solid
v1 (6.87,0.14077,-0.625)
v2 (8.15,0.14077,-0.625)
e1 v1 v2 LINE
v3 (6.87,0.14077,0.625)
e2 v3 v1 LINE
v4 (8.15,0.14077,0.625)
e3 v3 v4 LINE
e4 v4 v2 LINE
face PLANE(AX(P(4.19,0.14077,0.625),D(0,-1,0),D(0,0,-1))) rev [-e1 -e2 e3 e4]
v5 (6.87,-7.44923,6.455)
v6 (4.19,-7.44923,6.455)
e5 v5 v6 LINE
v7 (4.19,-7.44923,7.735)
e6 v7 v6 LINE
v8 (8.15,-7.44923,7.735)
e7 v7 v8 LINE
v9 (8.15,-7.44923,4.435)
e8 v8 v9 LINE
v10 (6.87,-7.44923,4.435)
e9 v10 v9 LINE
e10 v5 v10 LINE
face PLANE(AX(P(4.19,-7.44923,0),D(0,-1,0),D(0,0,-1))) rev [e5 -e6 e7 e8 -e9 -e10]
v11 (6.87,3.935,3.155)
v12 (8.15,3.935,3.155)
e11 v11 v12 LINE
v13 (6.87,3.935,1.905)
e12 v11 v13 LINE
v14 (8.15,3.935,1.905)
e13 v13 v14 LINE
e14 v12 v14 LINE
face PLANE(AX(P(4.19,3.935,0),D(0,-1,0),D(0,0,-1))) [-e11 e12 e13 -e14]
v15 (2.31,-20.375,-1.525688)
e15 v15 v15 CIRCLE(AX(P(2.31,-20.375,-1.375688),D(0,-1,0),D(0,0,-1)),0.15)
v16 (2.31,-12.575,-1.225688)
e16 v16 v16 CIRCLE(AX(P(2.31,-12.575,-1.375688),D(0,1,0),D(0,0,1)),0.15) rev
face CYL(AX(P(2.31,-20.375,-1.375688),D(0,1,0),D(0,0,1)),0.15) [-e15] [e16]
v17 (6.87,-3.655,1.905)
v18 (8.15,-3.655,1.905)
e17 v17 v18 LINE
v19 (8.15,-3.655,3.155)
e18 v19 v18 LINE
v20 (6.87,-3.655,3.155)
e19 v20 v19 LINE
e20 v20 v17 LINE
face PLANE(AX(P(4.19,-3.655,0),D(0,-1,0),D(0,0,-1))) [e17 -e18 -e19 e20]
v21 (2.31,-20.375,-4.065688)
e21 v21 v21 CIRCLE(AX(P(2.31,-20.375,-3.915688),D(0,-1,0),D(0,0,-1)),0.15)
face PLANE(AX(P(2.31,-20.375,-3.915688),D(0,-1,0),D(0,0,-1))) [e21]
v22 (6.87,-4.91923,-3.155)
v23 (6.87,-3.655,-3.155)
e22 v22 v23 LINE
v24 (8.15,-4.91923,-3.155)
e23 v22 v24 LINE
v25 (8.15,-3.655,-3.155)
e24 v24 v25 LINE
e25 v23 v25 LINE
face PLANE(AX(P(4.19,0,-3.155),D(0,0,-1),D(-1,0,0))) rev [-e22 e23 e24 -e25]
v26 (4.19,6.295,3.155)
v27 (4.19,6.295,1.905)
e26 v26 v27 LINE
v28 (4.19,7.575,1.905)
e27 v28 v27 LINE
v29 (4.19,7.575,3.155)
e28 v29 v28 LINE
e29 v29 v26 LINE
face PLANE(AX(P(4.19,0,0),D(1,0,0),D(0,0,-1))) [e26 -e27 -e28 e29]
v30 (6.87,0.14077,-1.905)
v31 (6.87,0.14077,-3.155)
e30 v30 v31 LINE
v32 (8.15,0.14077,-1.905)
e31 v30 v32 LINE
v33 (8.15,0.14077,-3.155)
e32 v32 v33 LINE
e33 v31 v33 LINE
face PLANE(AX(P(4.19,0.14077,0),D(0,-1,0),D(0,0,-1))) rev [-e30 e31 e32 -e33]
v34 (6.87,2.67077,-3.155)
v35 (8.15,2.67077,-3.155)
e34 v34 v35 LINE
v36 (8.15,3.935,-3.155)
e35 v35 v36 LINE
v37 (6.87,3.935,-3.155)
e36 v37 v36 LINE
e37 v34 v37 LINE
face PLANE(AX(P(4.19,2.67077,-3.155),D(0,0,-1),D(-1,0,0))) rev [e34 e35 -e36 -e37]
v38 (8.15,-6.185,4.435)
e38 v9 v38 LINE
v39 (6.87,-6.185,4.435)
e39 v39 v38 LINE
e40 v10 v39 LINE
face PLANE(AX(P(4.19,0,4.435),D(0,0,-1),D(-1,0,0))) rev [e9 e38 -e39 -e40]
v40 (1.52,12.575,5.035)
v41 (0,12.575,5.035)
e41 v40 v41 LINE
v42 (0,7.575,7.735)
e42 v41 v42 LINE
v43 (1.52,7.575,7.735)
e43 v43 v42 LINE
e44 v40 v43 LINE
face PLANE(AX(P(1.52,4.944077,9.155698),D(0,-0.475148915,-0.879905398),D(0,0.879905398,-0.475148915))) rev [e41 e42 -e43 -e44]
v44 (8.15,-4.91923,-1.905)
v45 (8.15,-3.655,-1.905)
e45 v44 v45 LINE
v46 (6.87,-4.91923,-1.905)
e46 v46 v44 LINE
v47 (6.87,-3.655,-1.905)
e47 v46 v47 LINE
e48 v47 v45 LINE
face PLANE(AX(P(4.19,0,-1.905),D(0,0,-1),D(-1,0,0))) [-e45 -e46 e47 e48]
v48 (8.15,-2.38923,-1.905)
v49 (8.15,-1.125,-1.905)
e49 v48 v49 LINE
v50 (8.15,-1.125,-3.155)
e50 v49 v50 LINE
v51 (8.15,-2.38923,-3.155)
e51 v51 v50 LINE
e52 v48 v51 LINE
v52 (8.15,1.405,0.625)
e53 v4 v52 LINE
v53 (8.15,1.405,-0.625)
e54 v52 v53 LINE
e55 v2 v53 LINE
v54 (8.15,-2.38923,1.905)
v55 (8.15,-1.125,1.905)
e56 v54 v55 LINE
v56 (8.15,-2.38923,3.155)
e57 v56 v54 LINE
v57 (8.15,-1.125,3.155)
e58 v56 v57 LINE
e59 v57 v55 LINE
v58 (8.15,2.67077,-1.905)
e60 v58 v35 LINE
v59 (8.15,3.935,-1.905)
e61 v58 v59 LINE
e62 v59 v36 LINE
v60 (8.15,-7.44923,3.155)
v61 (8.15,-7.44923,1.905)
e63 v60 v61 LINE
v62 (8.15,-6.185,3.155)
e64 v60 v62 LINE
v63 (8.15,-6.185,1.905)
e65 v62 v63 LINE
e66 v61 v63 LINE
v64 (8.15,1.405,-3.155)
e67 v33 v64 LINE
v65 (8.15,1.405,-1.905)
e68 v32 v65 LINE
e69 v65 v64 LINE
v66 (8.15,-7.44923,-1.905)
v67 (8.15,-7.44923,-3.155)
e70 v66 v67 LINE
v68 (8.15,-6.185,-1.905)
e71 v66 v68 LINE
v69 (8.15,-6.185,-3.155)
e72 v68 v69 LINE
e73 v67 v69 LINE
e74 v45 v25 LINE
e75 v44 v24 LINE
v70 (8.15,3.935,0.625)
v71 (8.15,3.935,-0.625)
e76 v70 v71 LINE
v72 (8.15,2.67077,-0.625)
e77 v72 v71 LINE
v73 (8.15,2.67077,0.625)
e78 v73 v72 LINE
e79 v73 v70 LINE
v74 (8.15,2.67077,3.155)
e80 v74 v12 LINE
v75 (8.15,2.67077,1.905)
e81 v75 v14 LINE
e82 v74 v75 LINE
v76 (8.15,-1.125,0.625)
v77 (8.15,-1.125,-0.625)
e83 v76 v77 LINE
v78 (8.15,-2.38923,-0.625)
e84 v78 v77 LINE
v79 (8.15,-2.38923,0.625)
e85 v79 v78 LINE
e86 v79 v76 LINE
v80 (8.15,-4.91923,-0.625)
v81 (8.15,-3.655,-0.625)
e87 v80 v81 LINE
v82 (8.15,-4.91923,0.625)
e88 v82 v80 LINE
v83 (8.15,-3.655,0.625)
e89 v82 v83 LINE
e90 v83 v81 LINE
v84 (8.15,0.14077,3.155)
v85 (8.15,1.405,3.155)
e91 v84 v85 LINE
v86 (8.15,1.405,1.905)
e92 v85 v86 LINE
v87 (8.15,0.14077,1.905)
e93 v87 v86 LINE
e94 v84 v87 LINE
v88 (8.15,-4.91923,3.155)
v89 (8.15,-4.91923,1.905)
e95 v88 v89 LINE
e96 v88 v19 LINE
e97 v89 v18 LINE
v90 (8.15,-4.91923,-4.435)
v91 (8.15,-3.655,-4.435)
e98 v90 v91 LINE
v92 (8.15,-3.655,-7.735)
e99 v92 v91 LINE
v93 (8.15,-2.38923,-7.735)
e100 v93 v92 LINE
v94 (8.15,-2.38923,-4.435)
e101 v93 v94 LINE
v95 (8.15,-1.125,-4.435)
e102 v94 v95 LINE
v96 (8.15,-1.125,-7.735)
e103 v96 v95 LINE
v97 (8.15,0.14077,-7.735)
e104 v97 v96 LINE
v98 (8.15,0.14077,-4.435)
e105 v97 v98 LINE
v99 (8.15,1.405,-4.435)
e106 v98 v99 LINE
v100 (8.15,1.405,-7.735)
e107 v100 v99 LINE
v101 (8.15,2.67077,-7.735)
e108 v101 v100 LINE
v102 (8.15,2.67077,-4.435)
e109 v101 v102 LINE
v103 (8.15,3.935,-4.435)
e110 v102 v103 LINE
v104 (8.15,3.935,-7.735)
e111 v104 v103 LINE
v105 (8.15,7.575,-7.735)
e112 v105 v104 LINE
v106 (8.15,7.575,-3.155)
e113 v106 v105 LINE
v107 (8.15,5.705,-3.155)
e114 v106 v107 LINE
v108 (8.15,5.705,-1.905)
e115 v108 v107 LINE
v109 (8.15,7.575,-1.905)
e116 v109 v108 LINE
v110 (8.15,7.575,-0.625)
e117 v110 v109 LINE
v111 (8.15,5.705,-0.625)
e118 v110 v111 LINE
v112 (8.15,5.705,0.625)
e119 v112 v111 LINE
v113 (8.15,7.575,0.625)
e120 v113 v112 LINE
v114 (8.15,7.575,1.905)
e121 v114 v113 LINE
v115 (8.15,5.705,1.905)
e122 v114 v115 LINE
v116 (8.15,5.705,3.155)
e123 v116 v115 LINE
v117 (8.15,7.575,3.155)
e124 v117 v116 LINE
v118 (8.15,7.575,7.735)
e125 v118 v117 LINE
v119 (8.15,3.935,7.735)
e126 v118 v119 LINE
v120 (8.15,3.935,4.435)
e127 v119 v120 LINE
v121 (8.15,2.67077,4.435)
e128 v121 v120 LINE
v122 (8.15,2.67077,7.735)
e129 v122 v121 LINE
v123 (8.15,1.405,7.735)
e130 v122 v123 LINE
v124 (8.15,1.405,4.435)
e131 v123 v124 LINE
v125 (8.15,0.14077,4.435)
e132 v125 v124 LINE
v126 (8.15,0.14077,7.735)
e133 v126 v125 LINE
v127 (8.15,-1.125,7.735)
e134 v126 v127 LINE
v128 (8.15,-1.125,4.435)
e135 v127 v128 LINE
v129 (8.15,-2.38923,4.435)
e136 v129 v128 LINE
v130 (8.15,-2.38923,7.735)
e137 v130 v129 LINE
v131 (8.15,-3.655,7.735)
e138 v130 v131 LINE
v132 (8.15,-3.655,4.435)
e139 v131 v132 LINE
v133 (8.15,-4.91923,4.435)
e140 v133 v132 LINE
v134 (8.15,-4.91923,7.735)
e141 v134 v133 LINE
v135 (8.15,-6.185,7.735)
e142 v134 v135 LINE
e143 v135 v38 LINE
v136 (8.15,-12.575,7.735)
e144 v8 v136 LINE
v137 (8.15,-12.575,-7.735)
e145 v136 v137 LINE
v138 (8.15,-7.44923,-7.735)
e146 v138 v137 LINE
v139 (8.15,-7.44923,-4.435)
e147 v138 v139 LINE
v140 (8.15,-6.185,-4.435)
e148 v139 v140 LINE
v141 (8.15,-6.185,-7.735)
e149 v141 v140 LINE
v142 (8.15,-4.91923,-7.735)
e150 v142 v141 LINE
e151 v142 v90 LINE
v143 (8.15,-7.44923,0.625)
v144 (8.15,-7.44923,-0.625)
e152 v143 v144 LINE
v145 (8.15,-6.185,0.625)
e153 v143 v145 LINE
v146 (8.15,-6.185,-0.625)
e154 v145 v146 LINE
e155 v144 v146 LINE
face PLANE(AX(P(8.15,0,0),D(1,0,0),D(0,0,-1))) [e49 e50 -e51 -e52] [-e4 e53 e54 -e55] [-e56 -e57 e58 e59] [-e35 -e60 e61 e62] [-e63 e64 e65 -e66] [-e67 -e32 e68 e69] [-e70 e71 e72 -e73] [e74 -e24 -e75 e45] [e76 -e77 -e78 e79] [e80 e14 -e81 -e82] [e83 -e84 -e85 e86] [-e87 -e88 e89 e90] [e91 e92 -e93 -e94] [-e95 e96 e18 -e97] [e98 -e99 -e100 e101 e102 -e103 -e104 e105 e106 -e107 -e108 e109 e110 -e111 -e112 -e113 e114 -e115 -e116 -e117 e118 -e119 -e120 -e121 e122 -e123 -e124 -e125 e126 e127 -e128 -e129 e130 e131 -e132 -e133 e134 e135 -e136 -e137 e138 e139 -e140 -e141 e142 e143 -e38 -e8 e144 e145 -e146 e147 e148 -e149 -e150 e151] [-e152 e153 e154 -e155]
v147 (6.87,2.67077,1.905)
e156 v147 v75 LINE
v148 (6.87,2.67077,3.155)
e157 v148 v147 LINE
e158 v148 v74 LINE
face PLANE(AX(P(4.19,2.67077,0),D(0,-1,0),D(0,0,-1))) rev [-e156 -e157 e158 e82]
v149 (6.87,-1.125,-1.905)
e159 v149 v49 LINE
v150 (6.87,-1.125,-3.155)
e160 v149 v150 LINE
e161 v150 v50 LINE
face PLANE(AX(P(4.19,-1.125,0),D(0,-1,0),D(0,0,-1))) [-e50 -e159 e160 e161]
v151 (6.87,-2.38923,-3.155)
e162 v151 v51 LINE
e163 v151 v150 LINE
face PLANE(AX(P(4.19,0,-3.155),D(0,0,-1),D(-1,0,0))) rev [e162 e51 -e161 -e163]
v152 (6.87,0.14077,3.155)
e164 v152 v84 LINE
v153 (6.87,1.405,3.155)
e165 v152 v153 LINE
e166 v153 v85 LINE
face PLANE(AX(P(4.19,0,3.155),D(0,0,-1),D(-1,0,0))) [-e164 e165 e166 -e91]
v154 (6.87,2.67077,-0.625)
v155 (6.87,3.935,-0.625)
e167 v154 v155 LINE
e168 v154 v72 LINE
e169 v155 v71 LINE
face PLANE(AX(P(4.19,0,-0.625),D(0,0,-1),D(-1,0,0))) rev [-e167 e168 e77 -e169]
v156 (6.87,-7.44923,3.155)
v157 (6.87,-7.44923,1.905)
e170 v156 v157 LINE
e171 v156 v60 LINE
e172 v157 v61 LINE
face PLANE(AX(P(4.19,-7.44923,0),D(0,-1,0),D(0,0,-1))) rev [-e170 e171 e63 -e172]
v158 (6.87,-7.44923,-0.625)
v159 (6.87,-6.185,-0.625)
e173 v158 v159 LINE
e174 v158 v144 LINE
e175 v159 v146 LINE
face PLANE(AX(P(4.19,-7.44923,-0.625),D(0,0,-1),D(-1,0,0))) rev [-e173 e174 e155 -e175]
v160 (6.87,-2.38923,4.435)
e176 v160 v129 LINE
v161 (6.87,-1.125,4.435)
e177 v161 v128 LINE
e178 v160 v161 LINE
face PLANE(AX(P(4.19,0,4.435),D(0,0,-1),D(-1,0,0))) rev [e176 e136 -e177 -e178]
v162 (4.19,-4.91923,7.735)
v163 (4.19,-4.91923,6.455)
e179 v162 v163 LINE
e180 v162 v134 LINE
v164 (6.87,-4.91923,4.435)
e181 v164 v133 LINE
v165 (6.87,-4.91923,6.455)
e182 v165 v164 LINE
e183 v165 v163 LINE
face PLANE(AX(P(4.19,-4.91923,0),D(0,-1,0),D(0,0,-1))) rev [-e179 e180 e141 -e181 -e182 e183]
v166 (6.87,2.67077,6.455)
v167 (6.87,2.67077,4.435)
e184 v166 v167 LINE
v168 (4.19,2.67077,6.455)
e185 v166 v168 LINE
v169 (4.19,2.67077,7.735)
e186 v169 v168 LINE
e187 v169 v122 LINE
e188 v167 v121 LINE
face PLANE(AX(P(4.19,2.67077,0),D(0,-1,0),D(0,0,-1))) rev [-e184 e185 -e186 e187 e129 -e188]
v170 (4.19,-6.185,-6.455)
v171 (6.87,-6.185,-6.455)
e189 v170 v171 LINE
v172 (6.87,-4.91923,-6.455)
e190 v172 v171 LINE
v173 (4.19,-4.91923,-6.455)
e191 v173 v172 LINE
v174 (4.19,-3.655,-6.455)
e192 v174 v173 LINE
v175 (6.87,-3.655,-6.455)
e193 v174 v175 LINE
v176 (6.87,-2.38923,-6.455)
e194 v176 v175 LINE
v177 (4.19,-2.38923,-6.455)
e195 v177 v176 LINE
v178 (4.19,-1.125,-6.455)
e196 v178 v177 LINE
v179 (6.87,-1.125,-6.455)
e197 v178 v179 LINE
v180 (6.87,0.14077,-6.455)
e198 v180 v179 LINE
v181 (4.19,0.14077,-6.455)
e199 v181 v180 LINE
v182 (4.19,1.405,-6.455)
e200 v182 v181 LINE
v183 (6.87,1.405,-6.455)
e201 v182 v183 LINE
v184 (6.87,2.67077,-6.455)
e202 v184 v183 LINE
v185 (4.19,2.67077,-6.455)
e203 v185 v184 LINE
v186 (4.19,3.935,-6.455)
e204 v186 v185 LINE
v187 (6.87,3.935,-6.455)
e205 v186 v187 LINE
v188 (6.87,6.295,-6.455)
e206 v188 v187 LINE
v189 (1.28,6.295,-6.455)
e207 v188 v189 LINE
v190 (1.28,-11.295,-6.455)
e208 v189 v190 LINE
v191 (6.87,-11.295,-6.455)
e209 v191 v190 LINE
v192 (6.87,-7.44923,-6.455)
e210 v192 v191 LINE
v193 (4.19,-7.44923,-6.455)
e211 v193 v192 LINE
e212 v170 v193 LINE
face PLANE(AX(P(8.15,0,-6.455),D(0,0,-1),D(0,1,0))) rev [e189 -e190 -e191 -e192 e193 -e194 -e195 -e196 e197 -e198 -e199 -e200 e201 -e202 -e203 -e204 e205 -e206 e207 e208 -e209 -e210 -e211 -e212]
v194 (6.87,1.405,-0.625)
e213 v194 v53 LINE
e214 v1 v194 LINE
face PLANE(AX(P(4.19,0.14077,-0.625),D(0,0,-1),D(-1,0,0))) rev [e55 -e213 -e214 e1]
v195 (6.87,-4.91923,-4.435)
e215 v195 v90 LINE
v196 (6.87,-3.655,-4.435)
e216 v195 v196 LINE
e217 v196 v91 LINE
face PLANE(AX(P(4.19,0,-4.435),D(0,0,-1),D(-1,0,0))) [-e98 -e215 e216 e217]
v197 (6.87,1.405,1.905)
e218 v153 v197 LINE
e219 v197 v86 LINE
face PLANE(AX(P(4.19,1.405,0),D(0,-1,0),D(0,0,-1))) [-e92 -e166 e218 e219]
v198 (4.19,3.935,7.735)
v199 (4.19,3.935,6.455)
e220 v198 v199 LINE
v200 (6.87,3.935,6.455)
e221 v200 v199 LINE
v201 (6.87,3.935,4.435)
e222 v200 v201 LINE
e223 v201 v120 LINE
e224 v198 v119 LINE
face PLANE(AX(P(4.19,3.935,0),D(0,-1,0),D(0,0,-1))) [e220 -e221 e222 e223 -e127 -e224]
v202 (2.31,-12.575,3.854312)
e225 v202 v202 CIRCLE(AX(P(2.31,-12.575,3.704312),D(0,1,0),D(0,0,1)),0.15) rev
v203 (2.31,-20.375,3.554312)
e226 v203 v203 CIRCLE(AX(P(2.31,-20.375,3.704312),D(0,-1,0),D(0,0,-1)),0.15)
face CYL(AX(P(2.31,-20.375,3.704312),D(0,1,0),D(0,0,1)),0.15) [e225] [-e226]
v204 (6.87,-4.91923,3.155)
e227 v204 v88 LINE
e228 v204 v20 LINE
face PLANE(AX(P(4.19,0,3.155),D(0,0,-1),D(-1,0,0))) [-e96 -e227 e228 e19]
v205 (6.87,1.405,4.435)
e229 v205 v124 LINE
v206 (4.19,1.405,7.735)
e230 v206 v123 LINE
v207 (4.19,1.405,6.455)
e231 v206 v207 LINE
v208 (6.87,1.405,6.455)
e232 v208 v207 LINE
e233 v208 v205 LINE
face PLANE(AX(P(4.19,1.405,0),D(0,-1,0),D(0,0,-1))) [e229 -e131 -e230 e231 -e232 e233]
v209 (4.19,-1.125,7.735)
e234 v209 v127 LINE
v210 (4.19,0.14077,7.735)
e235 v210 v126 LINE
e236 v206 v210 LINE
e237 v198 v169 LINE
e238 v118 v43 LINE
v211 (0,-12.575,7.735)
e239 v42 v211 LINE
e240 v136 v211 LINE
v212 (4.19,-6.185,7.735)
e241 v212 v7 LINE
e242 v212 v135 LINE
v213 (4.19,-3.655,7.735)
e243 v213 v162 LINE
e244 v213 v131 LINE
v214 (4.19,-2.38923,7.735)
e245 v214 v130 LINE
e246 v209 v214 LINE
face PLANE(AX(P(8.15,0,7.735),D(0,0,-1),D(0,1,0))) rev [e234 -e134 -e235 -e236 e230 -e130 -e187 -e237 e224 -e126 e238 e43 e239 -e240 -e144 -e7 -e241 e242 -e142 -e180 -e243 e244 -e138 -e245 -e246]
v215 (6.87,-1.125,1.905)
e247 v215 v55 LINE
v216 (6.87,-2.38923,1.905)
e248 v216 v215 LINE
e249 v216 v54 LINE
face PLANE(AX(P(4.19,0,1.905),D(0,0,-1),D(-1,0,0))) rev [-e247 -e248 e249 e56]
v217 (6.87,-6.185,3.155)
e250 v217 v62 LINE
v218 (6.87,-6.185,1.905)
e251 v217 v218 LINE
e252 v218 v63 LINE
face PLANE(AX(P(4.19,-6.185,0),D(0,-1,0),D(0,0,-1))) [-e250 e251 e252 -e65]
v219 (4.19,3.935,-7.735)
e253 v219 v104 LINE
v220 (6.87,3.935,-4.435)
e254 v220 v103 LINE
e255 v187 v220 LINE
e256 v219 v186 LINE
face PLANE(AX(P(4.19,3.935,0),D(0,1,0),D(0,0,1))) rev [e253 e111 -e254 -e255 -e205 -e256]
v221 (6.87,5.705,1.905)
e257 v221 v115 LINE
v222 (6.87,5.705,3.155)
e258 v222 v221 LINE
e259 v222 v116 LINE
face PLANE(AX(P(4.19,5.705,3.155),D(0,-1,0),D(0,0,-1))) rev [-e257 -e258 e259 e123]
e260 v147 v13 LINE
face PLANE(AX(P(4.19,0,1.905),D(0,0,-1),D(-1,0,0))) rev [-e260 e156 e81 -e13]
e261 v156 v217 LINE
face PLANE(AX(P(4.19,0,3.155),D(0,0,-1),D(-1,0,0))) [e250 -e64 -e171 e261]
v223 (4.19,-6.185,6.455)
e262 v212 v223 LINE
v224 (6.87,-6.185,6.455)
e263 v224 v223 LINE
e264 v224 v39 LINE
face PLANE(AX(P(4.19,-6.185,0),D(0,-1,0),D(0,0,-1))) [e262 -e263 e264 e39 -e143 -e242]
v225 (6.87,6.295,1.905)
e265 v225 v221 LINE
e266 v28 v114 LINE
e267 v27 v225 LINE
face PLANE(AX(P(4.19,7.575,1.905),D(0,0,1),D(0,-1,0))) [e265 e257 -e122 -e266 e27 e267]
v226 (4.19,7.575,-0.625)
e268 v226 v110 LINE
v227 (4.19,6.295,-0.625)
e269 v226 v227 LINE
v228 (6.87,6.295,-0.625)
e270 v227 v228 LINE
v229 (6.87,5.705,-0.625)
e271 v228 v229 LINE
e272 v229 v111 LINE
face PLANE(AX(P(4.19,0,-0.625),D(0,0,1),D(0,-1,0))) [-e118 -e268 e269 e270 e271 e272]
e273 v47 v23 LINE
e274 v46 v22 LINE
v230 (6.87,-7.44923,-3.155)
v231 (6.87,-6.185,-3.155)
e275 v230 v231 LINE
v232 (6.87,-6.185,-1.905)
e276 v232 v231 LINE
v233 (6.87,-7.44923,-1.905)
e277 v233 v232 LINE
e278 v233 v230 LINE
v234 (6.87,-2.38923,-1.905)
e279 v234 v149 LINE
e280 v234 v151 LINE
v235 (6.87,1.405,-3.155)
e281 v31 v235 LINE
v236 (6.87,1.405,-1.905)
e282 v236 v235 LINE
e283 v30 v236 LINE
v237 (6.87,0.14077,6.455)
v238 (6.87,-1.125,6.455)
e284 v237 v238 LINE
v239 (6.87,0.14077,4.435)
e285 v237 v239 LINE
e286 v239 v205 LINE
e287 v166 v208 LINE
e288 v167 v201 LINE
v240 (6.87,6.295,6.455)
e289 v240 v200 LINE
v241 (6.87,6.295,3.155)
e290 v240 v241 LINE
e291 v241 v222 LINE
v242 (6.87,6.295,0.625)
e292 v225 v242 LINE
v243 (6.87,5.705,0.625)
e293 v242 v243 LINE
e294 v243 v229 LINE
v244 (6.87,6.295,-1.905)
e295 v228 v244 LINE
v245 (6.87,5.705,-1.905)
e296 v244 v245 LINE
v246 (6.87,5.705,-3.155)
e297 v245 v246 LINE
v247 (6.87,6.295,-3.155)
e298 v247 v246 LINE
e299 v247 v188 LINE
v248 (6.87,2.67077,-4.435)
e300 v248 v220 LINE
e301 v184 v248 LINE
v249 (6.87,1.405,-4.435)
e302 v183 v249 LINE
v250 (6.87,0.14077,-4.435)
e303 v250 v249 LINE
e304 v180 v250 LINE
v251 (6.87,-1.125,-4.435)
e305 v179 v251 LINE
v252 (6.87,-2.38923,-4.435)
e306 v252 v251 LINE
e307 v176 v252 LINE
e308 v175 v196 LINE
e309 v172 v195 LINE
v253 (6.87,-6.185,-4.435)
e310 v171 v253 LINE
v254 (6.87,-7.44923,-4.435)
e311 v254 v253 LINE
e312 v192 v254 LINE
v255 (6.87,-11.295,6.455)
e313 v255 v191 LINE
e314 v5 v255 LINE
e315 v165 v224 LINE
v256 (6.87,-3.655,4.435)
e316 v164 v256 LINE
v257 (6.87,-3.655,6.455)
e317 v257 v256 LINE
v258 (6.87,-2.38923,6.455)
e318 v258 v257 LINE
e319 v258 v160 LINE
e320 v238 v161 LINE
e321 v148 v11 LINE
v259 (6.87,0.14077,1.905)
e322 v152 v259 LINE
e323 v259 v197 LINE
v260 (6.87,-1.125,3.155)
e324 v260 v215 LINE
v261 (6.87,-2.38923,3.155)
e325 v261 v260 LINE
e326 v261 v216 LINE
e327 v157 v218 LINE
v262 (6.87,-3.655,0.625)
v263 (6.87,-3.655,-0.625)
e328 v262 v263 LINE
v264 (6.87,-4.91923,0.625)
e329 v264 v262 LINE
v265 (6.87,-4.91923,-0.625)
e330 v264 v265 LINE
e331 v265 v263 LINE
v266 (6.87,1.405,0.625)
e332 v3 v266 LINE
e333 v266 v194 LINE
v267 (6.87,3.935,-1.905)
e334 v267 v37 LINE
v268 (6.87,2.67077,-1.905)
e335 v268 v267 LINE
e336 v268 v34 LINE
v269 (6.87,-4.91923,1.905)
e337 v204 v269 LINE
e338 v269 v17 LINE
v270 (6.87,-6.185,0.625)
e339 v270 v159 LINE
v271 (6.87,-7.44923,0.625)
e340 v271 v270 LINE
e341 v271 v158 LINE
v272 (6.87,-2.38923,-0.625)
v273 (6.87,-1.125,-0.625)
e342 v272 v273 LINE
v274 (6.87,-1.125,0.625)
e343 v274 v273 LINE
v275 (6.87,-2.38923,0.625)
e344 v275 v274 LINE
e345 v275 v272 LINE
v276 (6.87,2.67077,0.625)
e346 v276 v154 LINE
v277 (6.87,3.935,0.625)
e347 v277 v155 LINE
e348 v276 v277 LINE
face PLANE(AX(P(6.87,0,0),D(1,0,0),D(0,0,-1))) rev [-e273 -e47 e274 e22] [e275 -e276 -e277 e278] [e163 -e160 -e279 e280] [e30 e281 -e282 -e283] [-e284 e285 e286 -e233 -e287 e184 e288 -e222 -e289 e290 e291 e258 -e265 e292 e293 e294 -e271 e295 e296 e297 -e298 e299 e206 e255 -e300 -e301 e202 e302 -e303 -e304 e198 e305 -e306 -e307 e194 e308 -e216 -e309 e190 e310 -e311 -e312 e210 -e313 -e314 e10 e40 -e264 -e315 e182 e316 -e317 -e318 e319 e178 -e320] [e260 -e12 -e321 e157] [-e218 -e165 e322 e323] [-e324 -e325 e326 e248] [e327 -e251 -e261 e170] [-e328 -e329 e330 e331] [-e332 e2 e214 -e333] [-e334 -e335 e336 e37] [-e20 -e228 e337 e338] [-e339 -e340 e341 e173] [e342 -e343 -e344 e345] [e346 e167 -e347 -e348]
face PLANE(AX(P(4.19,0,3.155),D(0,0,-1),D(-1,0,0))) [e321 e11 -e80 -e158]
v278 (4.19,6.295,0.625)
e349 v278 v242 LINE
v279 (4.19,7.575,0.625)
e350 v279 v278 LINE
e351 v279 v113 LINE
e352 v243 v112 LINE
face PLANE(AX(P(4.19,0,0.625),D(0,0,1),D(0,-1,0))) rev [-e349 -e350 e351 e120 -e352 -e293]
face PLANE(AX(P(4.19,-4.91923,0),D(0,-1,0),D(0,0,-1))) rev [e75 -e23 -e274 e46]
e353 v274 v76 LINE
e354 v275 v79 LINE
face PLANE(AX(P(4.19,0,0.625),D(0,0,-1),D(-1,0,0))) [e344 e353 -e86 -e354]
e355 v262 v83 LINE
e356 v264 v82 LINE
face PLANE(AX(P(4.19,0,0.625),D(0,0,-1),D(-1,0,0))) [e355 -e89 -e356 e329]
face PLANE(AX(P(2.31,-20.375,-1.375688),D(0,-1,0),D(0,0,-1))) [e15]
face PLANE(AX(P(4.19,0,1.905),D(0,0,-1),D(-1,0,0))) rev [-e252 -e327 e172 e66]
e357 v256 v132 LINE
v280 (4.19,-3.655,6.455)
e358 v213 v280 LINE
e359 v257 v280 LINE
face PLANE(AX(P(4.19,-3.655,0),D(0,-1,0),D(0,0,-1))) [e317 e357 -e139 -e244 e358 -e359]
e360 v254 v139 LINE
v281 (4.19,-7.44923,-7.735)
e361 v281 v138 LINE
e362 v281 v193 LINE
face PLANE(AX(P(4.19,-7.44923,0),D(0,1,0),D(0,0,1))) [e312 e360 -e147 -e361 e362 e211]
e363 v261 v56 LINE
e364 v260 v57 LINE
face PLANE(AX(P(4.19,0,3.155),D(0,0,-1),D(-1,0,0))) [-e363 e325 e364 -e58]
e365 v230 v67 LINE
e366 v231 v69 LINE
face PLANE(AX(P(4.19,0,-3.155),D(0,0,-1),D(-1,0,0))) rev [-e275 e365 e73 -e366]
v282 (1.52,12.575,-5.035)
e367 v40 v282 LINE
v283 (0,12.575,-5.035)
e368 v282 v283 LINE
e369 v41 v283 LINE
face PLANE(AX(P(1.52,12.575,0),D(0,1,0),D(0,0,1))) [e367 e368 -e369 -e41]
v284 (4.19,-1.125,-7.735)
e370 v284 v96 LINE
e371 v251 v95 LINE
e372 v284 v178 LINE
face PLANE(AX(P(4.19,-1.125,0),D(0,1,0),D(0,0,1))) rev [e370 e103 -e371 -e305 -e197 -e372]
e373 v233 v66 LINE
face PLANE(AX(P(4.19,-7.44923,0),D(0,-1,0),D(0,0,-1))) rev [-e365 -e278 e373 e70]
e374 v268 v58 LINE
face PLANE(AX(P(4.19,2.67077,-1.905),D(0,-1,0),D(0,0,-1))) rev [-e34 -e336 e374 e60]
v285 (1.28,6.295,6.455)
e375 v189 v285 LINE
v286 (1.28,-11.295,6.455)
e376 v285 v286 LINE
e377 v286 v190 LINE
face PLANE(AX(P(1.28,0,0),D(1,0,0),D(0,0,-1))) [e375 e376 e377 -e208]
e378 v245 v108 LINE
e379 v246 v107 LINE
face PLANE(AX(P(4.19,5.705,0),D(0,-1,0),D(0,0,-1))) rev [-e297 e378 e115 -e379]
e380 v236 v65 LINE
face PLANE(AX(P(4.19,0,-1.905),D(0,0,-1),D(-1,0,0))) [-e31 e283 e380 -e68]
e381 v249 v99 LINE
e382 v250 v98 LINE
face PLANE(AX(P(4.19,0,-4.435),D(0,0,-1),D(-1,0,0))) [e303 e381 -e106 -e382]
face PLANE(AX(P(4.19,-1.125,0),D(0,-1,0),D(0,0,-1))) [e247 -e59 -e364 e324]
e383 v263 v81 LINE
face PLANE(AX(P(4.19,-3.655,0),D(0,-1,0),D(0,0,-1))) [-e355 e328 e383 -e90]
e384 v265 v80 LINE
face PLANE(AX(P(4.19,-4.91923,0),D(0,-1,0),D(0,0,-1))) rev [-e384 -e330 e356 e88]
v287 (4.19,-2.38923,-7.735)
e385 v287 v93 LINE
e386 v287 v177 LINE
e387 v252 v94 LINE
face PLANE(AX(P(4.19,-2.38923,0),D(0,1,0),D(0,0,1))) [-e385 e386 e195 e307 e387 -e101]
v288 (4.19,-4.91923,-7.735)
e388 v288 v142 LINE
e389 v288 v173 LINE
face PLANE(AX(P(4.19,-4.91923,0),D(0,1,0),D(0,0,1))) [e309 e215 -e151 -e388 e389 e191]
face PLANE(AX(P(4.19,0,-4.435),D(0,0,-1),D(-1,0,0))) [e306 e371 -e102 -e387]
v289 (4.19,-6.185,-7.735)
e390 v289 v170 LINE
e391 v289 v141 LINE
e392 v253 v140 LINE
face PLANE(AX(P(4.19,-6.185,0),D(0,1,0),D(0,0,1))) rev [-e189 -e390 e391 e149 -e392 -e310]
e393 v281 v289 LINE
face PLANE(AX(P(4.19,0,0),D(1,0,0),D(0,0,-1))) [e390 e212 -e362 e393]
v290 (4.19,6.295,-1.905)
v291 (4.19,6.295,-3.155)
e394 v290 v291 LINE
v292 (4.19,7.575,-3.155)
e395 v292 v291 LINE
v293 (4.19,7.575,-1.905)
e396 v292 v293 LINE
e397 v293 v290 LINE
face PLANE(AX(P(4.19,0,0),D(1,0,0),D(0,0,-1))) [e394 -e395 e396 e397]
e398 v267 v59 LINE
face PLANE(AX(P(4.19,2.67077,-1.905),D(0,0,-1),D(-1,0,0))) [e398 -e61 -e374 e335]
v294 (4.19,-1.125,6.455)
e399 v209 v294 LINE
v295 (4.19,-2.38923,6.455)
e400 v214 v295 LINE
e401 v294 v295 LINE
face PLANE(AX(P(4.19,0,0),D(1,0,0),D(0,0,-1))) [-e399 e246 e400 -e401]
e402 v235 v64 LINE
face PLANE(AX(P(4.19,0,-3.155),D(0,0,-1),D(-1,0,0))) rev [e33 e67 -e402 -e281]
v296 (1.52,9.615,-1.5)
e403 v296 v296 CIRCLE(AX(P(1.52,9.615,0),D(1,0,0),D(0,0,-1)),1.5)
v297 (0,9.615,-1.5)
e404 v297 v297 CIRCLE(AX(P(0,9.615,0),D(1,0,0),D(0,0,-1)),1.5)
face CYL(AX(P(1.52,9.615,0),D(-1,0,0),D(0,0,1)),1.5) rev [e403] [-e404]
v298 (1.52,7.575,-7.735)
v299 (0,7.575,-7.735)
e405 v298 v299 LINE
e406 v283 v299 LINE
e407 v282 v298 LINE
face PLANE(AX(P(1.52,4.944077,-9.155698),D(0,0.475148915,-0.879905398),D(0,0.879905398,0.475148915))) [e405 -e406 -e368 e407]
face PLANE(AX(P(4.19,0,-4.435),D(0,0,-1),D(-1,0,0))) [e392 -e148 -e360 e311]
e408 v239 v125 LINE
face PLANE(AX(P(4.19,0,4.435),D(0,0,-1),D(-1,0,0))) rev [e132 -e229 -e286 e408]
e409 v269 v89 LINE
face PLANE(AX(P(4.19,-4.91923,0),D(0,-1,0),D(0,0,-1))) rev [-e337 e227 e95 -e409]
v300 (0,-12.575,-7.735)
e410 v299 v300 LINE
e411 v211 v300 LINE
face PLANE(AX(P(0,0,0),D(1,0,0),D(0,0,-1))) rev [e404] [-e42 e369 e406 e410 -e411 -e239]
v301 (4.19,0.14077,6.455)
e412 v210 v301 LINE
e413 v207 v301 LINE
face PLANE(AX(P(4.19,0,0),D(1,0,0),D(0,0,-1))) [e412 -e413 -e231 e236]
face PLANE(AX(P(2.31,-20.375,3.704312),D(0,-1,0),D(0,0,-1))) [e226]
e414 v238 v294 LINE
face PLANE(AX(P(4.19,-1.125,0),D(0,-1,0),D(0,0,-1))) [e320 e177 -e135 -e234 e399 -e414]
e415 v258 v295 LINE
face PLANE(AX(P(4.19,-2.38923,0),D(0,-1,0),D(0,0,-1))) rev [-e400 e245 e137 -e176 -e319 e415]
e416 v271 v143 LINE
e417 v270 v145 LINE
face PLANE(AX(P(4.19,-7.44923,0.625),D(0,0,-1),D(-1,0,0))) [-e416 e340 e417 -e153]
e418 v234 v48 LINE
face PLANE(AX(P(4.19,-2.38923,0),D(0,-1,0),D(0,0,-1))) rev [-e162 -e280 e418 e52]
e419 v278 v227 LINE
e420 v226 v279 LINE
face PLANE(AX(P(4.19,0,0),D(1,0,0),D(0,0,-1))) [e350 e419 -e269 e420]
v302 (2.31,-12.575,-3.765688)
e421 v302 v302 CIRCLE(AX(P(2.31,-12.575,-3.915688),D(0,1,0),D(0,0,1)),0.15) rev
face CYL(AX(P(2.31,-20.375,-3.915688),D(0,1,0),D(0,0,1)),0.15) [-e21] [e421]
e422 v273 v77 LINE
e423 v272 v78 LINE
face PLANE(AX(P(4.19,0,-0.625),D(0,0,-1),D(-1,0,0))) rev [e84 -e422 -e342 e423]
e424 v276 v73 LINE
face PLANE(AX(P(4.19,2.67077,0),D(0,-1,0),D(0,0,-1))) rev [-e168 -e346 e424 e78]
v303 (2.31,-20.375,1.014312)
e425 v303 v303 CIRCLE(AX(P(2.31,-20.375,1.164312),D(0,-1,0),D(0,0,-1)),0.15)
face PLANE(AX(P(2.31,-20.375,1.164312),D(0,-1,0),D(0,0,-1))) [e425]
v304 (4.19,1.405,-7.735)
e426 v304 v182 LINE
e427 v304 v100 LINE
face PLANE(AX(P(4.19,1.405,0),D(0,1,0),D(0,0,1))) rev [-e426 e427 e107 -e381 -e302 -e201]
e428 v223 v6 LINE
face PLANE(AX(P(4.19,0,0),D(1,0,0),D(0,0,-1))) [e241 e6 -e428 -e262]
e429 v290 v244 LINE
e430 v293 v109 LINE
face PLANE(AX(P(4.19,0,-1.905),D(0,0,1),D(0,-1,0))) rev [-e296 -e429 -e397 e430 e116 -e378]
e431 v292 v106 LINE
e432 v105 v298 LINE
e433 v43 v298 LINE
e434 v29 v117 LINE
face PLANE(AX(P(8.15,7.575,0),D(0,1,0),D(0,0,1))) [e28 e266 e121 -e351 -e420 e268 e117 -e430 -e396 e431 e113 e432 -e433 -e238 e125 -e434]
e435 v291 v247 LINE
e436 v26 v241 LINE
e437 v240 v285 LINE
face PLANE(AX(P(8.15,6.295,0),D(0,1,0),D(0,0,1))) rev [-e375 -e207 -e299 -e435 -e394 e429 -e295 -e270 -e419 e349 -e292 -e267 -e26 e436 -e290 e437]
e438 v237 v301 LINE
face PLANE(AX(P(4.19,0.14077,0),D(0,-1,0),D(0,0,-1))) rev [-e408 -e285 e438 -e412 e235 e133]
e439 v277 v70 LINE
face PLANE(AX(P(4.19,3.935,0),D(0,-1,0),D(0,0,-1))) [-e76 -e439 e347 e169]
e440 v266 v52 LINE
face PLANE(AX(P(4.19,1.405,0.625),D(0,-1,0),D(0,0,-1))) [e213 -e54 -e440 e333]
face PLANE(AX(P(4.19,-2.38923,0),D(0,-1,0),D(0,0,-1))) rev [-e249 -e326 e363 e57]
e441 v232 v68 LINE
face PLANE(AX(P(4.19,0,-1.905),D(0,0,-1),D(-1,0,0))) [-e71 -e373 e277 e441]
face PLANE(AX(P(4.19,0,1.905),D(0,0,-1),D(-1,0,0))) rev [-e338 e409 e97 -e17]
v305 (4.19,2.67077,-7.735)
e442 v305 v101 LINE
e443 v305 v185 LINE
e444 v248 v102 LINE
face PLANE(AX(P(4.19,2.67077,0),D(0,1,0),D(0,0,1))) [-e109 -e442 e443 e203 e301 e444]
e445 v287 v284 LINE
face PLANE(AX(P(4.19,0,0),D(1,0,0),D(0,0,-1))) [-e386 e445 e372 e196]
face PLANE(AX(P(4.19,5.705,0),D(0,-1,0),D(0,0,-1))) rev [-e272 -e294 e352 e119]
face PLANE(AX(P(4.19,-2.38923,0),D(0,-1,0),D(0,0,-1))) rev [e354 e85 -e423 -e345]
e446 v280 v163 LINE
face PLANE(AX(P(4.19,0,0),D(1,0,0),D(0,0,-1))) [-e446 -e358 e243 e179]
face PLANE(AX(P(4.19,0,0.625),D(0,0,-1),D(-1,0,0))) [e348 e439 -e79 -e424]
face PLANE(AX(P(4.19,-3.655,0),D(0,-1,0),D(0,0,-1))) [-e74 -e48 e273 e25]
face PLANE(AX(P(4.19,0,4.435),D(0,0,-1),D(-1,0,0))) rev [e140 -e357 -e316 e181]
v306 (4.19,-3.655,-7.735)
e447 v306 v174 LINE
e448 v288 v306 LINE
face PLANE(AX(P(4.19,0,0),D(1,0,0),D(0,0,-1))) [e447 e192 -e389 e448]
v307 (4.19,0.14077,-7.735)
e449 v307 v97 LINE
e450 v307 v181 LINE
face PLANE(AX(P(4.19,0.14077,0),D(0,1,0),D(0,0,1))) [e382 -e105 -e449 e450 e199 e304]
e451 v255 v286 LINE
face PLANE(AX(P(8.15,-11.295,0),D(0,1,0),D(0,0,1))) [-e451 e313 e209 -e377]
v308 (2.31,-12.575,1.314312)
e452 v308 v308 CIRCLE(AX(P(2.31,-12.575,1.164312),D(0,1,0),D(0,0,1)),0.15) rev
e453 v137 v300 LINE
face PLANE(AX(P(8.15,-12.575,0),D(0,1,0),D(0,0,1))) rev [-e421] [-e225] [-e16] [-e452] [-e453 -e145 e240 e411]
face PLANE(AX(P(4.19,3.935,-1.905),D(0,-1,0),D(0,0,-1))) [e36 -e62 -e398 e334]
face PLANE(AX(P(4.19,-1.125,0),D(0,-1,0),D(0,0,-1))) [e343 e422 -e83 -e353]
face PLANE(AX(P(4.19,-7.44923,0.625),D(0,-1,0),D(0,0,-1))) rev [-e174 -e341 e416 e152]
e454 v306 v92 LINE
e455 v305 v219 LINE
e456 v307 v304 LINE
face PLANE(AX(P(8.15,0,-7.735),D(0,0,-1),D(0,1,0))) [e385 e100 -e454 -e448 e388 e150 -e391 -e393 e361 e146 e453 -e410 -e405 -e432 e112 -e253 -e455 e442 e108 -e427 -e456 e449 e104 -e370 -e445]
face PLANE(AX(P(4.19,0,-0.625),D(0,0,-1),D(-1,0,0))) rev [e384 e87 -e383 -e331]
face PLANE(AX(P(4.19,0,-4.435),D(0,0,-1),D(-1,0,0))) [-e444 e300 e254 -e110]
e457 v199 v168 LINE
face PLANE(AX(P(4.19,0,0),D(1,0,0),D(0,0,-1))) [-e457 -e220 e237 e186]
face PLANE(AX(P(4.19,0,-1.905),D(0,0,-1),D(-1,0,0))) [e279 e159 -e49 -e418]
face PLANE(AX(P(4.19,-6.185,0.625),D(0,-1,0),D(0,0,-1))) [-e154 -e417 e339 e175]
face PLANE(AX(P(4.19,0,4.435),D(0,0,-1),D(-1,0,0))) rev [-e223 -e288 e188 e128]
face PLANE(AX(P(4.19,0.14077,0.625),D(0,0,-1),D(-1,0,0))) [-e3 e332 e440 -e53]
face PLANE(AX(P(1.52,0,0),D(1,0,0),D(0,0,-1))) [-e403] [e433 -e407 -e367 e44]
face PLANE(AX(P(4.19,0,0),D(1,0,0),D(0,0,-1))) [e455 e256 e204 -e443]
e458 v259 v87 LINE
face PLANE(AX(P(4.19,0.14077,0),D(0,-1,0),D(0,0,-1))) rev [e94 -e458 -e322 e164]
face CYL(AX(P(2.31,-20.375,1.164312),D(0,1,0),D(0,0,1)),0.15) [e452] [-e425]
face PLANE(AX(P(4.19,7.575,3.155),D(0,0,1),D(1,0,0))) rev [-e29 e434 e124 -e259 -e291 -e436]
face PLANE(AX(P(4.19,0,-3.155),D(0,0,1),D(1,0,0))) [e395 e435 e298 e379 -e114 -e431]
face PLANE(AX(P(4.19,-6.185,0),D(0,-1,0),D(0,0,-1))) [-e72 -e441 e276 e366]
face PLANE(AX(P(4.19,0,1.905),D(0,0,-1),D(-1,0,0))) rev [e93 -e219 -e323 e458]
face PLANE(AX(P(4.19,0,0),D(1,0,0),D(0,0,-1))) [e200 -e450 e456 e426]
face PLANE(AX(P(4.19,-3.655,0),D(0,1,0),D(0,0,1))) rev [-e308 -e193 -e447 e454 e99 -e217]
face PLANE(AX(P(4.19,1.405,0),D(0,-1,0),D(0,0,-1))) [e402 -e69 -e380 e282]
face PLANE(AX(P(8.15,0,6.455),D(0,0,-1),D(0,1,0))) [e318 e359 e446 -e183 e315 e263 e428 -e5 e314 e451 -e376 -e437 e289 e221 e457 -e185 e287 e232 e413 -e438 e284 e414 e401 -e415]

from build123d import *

# Parameters (mm, degrees)
SKETCH1_W           = 15.47
SKETCH1_H           = 20.15
BOSS_EXTRUDE1_DEPTH = 8.15
SKETCH1_4_R         = 1.5
SKETCH1_4_W         = 15.47
SKETCH1_4_H         = 20.15
BOSS_EXTRUDE2_DEPTH = 1.52
SHELL1_START        = -6.455
SHELL1_OUTLINE_W    = 5.59
SHELL1_OUTLINE_H    = 17.59
SHELL1_DEPTH        = 12.91
SKETCH2_W           = 1.25
SKETCH2_H           = 1.87
SKETCH2_H_2         = 1.264229858
SKETCH2_W_2         = 3.3
CUT_EXTRUDE1_DEPTH  = 3.96
SKETCH3_R           = 0.15
BOSS_EXTRUDE3_DEPTH = 7.8


# Read off the part's stored shape, not the designer's step: Shell1
with BuildPart() as part:
    # Sketch1 → Boss-Extrude1 (new body)
    with BuildSketch(Plane(origin=(0, 0, 0), x_dir=(0, 0, -1), z_dir=(1, 0, 0))):
        with Locations((0, -2.5)):
            Rectangle(SKETCH1_W, SKETCH1_H)
    extrude(amount=BOSS_EXTRUDE1_DEPTH)

    # Sketch1<4> → Boss-Extrude2 (add)
    # profile 1 of 2: a face of its own
    with BuildSketch(Plane(origin=(0, 0, 0), x_dir=(0, 0, -1), z_dir=(1, 0, 0))):
        Polygon((-5.035, 12.575), (-7.735, 7.575), (7.735, 7.575), (5.035, 12.575), align=None)
        with Locations((0, 9.615)):
            Circle(SKETCH1_4_R, mode=Mode.SUBTRACT)
    # profile 2 of 2: a face of its own
    with BuildSketch(Plane(origin=(0, 0, 0), x_dir=(0, 0, -1), z_dir=(1, 0, 0))):
        with Locations((0, -2.5)):
            Rectangle(SKETCH1_4_W, SKETCH1_4_H)
    extrude(amount=BOSS_EXTRUDE2_DEPTH)

    # Shell1 outline → Shell1 (cut)
    with BuildSketch(Plane.XY.offset(SHELL1_START)):
        with Locations((4.075, -2.5)):
            Rectangle(SHELL1_OUTLINE_W, SHELL1_OUTLINE_H)
    extrude(amount=SHELL1_DEPTH, mode=Mode.SUBTRACT)

    # Sketch2 → Cut-Extrude1 (cut)
    with BuildSketch(Plane(origin=(8.15, 0, 0), x_dir=(0, 0, -1), z_dir=(1, 0, 0))):
        with Locations((0, 6.64)):
            Rectangle(SKETCH2_W, SKETCH2_H)
        with Locations((2.53, 6.64)):
            Rectangle(SKETCH2_W, SKETCH2_H)
        with Locations((2.53, 0.772885071)):
            Rectangle(SKETCH2_W, SKETCH2_H_2)
        with Locations((6.085, 0.772885071)):
            Rectangle(SKETCH2_W_2, SKETCH2_H_2)
        with Locations((6.085, 3.302885071)):
            Rectangle(SKETCH2_W_2, SKETCH2_H_2)
        with Locations((0, 3.302885071)):
            Rectangle(SKETCH2_W, SKETCH2_H_2)
        with Locations((-2.53, 0.772885071)):
            Rectangle(SKETCH2_W, SKETCH2_H_2)
        with Locations((-2.53, 3.302885071)):
            Rectangle(SKETCH2_W, SKETCH2_H_2)
        with Locations((-6.085, 3.302885071)):
            Rectangle(SKETCH2_W_2, SKETCH2_H_2)
        with Locations((-6.085, 0.772885071)):
            Rectangle(SKETCH2_W_2, SKETCH2_H_2)
        with Locations((-6.085, -1.757114929)):
            Rectangle(SKETCH2_W_2, SKETCH2_H_2)
        with Locations((-6.085, -4.287114929)):
            Rectangle(SKETCH2_W_2, SKETCH2_H_2)
        with Locations((-2.53, -1.757114929)):
            Rectangle(SKETCH2_W, SKETCH2_H_2)
        with Locations((0, -1.757114929)):
            Rectangle(SKETCH2_W, SKETCH2_H_2)
        with Locations((2.53, -1.757114929)):
            Rectangle(SKETCH2_W, SKETCH2_H_2)
        with Locations((6.085, -1.757114929)):
            Rectangle(SKETCH2_W_2, SKETCH2_H_2)
        with Locations((6.085, -4.287114929)):
            Rectangle(SKETCH2_W_2, SKETCH2_H_2)
        with Locations((2.53, -4.287114929)):
            Rectangle(SKETCH2_W, SKETCH2_H_2)
        with Locations((0, -4.287114929)):
            Rectangle(SKETCH2_W, SKETCH2_H_2)
        with Locations((-2.53, -4.287114929)):
            Rectangle(SKETCH2_W, SKETCH2_H_2)
        with Locations((6.085, -6.817114929)):
            Rectangle(SKETCH2_W_2, SKETCH2_H_2)
        with Locations((2.53, -6.817114929)):
            Rectangle(SKETCH2_W, SKETCH2_H_2)
        with Locations((-2.53, -6.817114929)):
            Rectangle(SKETCH2_W, SKETCH2_H_2)
        with Locations((-6.085, -6.817114929)):
            Rectangle(SKETCH2_W_2, SKETCH2_H_2)
        with Locations((-2.53, 6.64)):
            Rectangle(SKETCH2_W, SKETCH2_H)
        with Locations((2.53, 3.302885071)):
            Rectangle(SKETCH2_W, SKETCH2_H_2)
        with Locations((0, 0.772885071)):
            Rectangle(SKETCH2_W, SKETCH2_H_2)
        with Locations((0, -6.817114929)):
            Rectangle(SKETCH2_W, SKETCH2_H_2)
    extrude(amount=-CUT_EXTRUDE1_DEPTH, mode=Mode.SUBTRACT)

    # Sketch3 → Boss-Extrude3 (add)
    with BuildSketch(Plane.XZ.offset(12.575)):
        with Locations(Location((2.31, 3.704312159, 0), (0, 0, 90))):
            Circle(SKETCH3_R)
        with Locations(Location((2.31, 1.164312159, 0), (0, 0, 90))):
            Circle(SKETCH3_R)
        with Locations(Location((2.31, -1.375687841, 0), (0, 0, 90))):
            Circle(SKETCH3_R)
        with Locations(Location((2.31, -3.915687841, 0), (0, 0, 90))):
            Circle(SKETCH3_R)
    extrude(amount=BOSS_EXTRUDE3_DEPTH)


solid = part.part
